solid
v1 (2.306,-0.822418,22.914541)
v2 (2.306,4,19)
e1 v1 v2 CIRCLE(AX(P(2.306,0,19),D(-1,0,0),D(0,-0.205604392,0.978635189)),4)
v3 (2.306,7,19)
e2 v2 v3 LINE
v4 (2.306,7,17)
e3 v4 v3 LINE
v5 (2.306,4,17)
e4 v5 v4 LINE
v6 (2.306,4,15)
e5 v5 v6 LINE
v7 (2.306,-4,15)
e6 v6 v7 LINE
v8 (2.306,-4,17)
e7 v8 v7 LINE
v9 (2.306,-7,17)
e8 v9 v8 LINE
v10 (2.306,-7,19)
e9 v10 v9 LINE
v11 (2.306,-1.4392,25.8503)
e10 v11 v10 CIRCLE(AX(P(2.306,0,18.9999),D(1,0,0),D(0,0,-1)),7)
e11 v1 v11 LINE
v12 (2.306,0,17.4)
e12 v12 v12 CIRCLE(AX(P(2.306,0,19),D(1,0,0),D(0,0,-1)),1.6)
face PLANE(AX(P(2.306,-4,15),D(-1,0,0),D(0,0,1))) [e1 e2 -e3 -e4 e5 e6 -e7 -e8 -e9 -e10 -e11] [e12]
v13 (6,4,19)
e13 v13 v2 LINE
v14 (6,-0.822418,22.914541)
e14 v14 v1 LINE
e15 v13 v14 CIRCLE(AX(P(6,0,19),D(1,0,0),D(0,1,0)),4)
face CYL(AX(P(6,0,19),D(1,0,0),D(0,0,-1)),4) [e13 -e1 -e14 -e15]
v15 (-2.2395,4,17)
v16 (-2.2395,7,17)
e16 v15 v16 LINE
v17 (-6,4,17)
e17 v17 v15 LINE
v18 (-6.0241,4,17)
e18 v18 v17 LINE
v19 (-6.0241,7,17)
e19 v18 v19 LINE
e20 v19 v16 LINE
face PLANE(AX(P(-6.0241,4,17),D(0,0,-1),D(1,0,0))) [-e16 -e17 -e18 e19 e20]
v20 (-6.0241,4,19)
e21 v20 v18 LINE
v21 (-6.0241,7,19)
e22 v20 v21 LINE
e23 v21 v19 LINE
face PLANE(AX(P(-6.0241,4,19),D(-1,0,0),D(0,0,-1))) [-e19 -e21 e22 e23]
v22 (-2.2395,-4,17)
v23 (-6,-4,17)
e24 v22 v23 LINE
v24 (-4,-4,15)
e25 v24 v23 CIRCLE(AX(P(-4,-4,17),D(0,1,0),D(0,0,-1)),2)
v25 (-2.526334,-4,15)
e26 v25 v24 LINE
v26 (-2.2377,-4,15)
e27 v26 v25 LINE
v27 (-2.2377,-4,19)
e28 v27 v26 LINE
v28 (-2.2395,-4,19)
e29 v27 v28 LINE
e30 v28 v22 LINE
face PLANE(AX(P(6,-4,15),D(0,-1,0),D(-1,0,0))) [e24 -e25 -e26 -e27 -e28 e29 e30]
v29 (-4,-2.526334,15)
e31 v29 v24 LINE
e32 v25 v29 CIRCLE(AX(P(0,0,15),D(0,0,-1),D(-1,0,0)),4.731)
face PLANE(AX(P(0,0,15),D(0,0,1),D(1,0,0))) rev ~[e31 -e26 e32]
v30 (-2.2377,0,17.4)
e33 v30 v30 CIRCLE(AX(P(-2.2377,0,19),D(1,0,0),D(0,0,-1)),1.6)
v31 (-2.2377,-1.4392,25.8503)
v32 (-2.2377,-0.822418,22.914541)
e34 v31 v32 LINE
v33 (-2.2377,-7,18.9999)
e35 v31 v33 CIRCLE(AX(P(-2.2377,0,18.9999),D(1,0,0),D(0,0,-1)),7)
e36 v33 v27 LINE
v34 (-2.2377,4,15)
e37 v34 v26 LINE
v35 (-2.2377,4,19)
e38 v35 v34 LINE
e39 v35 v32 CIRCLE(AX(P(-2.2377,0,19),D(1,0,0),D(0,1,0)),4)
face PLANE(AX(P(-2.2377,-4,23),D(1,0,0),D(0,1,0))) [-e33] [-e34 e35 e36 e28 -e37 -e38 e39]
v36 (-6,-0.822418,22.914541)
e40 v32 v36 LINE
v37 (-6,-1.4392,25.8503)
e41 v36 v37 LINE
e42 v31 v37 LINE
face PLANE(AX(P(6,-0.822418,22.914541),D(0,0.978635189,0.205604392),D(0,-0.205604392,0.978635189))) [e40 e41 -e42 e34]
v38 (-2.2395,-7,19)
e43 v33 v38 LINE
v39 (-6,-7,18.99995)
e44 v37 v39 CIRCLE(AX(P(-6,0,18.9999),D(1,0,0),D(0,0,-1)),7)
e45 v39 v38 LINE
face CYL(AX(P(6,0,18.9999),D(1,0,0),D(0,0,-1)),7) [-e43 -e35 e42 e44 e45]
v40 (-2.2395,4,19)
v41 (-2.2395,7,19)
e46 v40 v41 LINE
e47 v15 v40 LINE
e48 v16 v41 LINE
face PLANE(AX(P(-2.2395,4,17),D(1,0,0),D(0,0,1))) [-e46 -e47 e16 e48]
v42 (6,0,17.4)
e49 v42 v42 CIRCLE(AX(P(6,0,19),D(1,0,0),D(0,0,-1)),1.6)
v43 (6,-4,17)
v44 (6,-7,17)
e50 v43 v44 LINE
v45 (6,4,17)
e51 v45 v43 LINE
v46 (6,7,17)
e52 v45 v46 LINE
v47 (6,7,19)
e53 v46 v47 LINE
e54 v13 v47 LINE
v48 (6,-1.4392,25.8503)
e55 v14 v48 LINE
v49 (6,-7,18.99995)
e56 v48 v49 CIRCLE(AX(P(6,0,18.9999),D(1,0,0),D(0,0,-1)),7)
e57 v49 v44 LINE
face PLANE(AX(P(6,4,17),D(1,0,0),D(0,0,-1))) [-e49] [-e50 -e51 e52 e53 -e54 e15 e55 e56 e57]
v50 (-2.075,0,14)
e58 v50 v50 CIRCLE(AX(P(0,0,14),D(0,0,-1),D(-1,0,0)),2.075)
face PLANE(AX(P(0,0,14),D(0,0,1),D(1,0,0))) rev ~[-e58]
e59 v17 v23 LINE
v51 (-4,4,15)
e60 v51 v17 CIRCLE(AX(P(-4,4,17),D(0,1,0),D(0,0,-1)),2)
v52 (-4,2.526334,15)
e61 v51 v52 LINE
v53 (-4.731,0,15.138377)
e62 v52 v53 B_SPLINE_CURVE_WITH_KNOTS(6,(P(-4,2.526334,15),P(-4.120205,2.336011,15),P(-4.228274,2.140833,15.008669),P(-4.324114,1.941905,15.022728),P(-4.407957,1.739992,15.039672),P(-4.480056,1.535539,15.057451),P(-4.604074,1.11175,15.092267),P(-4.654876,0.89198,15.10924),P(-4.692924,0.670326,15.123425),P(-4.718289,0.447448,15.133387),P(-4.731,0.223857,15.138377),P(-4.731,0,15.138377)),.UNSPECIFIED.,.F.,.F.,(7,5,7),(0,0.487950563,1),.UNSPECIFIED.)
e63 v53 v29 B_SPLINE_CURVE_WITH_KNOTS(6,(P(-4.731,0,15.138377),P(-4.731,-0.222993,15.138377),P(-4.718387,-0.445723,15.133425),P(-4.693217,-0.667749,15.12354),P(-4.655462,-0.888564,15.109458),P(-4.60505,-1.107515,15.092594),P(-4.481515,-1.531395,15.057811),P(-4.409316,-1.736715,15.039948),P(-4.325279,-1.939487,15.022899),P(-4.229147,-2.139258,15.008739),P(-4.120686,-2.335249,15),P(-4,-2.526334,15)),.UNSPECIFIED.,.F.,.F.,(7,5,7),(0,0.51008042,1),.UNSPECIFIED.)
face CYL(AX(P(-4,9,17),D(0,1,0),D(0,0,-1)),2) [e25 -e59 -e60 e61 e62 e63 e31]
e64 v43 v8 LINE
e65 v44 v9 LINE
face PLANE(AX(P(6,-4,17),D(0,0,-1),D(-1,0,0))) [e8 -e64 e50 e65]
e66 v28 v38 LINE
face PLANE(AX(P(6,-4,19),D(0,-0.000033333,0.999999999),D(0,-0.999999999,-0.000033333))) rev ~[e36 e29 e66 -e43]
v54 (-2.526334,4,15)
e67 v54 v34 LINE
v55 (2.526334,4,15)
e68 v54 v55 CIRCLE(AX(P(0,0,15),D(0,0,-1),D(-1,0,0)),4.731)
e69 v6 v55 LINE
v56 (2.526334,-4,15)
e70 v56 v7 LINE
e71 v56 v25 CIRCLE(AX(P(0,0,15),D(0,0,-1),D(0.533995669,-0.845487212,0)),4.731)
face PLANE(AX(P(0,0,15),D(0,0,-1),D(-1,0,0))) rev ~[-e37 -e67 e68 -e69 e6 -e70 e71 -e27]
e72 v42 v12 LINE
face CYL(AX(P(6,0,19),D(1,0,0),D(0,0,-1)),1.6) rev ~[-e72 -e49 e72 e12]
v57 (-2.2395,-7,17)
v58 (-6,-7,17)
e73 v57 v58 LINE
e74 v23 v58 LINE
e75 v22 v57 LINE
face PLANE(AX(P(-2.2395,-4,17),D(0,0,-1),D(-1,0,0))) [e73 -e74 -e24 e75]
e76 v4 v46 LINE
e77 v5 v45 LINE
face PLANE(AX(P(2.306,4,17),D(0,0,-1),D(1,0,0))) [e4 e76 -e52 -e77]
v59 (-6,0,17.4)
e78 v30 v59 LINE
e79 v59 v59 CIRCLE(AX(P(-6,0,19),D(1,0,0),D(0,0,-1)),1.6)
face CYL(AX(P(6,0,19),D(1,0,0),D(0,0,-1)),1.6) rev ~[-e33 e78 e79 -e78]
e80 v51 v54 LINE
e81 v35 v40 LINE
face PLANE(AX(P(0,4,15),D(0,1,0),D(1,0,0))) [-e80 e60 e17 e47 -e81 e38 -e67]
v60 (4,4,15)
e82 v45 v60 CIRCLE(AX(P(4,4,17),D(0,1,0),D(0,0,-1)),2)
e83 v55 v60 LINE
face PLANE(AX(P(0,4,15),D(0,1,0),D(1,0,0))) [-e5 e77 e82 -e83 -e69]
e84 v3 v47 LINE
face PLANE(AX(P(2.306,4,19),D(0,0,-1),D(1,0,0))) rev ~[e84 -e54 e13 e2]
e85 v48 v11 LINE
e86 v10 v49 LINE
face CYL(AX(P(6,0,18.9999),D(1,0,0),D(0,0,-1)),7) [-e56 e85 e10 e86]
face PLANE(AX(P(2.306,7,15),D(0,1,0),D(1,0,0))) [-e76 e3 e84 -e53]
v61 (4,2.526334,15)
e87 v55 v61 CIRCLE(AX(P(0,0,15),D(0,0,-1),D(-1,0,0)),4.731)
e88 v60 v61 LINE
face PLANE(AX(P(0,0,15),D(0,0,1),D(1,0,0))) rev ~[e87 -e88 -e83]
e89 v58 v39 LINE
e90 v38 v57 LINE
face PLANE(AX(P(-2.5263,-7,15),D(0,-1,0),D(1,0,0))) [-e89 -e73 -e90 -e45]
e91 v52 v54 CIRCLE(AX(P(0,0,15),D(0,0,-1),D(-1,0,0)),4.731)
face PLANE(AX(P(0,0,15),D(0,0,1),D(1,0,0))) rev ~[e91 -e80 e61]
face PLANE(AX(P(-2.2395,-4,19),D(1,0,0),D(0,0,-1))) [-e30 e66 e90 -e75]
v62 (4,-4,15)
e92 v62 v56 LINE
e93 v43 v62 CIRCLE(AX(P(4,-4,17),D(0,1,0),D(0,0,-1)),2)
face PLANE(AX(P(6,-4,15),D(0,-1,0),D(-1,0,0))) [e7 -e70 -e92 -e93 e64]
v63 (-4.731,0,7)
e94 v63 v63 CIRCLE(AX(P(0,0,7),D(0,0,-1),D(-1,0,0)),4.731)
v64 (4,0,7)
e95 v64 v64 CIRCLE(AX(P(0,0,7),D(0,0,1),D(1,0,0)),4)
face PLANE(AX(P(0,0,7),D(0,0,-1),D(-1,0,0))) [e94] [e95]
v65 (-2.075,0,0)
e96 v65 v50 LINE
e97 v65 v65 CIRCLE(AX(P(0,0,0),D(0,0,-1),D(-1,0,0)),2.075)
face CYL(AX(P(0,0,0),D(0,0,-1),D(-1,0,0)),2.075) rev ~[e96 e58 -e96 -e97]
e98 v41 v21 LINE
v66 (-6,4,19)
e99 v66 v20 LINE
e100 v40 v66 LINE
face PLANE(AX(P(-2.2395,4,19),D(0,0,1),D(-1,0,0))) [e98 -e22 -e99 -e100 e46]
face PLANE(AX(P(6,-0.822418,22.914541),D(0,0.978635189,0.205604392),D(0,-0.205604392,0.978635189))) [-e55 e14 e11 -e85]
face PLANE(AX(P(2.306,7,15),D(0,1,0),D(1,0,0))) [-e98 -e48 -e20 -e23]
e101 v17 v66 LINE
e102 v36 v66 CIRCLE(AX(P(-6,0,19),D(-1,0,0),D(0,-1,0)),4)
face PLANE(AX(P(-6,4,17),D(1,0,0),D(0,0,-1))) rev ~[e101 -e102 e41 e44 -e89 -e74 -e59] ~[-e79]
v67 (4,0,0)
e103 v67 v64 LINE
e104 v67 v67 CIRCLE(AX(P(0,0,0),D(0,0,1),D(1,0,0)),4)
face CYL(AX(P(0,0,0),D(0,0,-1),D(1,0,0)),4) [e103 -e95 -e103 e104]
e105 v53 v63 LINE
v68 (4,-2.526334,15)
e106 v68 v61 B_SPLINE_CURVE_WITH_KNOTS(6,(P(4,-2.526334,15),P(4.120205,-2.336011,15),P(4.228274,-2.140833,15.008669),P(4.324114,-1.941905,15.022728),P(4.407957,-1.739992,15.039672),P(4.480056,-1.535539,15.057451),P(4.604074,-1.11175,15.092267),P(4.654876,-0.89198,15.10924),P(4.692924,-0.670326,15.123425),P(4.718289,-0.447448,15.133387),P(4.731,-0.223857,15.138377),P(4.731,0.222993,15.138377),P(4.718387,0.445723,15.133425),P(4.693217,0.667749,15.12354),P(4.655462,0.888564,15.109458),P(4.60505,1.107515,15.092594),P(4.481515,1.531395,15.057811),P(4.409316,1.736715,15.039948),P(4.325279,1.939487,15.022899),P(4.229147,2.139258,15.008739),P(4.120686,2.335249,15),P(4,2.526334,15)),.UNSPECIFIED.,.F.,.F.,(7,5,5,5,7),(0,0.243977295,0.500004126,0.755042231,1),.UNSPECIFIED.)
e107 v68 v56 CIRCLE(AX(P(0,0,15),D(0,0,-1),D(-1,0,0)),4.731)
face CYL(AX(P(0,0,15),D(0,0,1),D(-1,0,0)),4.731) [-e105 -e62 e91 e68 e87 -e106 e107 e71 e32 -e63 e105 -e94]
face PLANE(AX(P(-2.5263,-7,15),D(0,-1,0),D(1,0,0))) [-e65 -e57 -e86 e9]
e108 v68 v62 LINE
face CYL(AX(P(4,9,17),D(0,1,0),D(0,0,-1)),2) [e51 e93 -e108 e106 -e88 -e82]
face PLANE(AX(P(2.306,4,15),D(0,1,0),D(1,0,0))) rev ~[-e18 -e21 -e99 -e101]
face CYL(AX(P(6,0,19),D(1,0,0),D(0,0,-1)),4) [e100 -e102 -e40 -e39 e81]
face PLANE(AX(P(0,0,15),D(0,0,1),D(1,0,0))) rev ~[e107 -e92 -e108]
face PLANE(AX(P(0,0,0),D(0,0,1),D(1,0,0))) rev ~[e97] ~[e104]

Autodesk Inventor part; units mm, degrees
ref_plane "YZ Plane" through (0, 0, 0) normal (1, 0, 0) x (0, 1, 0)
ref_plane "XZ Plane" through (0, 0, 0) normal (0, 1, 0) x (-1, 0, 0)
ref_plane "XY Plane" through (0, 0, 0) normal (0, 0, 1) x (1, 0, 0)
sketch "Sketch1" plane through (0, 0, 0) normal (0, 0, 1) x (1, 0, 0)
  circle A0 centre (0, 0) radius 2
  circle A1 centre (0, 0) radius 4
  dimension "d0" = 4
  dimension "d1" = 8
extrude "Extrusion1" add sketch "Sketch1" along normal blind 15
sketch "Sketch2" plane through (0, 0, 15) normal (0, 0, 1) x (1, 0, 0)
  circle A0 centre (0, 0) radius 4 projected
  line L0 (0, 4) -> (6, 4)
  line L1 (6, 4) -> (6, -4)
  line L2 (6, -4) -> (0, -4)
  line L3 (0, -4) -> (0, 4)
  line L4 (0, 4) -> (-6, 4)
  line L5 (-6, 4) -> (-6, -4)
  line L6 (-6, -4) -> (0, -4)
  line L7 (0, -4) -> (0, 4)
  dimension "d4" = 6
  dimension "d5" = 6
extrude "Extrusion2" add sketch "Sketch2" along normal blind 8
sketch "Sketch3" plane through (0, 0, 23) normal (0, 0, 1) x (1, 0, 0)
  line L0 (6, 4) -> (-6, 4) projected
  line L1 (-6, -4) -> (6, -4) projected
  line L2 (-2.2377, 4) -> (2.306, 4)
  line L3 (2.306, 4) -> (2.306, -4)
  line L4 (2.306, -4) -> (-2.2377, -4)
  line L5 (-2.2377, -4) -> (-2.2377, 4)
  point P0 (0, 0)
extrude "Extrusion3" cut sketch "Sketch3" against normal blind 8
sketch "Sketch4" plane through (0, 0, 15) normal (0, 0, -1) x (-1, 0, 0)
  circle A0 centre (0, 0) radius 4
  circle A1 centre (0, 0) radius 4.731
extrude "Extrusion4" add sketch "Sketch4" along normal blind 8
sketch "Sketch5" plane through (6, -4, 15) normal (1, 0, 0) x (0, 0, -1)
  line L0 (0, 8) -> (-8, 8) projected
  line L1 (0, 0) -> (-8, 0) projected
  line L2 (-8, 8) -> (0, 8)
  line L3 (0, 8) -> (0, 0)
  line L4 (0, 0) -> (-8, 0)
  line L5 (-8, 0) -> (-8, 8)
  circle A0 centre (-4, 4) radius 1.6
  circle A1 centre (-4, 4) radius 4
  point P0 (15, 4)
  point P1 (-8, 4)
  point P2 (-4, 8)
  point P3 (-4, 0)
  dimension "d12" = 3.2
extrude "Extrusion5" cut sketch "Sketch5" against normal blind 14 contours A1 L5 L0 | A1 L1 L5 | A0
fillet "Fillet1" radius 2 2 edges at (-6, 0, 15) (6, 0, 15)
sketch "Sketch7" plane through (2.306, 4, 15) normal (0, 1, 0) x (1, 0, 0)
  point P0 (-2.306, 15)
sketch "Sketch8" plane through (2.306, 4, 15) normal (0, 1, 0) x (1, 0, 0)
  line L0 (0, -4) -> (3.694, -4) projected
  line L1 (0, 0) -> (0, -4) projected
  line L2 (3.694, -4) -> (0, -4)
  line L3 (0, -4) -> (0, -2)
  line L4 (0, -2) -> (3.694, -2)
  line L5 (3.694, -2) -> (3.694, -4)
  line L6 (-4.5455, -4) -> (-8.3301, -4)
  line L7 (-8.3301, -4) -> (-8.3301, -2)
  line L8 (-8.3301, -2) -> (-4.5455, -2)
  line L9 (-4.5455, -2) -> (-4.5455, -4)
  point P0 (-2.306, 15)
extrude "Extrusion7" add sketch "Sketch8" along normal blind 3
sketch "Sketch9" plane through (-2.5263, -4, 15) normal (0, -1, 0) x (1, 0, 0)
  line L0 (-3.4737, 2) -> (-3.4737, 4) projected
  line L1 (0.2868, 2) -> (-3.4978, 2) projected
  line L2 (-3.4737, 4) -> (0.2868, 4)
  line L3 (0.2868, 4) -> (0.2868, 2)
  line L4 (0.2868, 2) -> (-3.4737, 2)
  line L5 (-3.4737, 2) -> (-3.4737, 4)
  line L6 (4.8006, 4) -> (8.5263, 4)
  line L7 (8.5263, 4) -> (8.5263, 2)
  line L8 (8.5263, 2) -> (4.8006, 2)
  line L9 (4.8006, 2) -> (4.8006, 4)
  point P0 (2.5263, -15)
extrude "Extrusion8" add sketch "Sketch9" along normal blind 3
sketch "Sketch10" plane through (6, 4, 17) normal (1, 0, 0) x (0, 0, -1)
  circle A0 centre (-1.9999, -4) radius 7
  circle A1 centre (-2, -4) radius 1.6 projected
  circle A2 centre (-2, -4) radius 4
  line L0 (-2, -8) -> (-1.9999, -11)
  line L1 (-2, -4) -> (-8.8503, -5.4392)
  point P0 (17, -4)
  point P1 (-5.9145, -4.8224)
  dimension "d24" = 14
extrude "Extrusion9" add sketch "Sketch10" against normal blind 12 contours L1 A2 L0 A0 picked at (-2.5257, -9.94)
sketch "Sketch11" plane through (-2.5263, -4, 15) normal (0, -1, 0) x (1, 0, 0)
  line L0 (0, 0) -> (0.2886, 0) projected
  line L1 (0.2886, 0) -> (4.8323, 0)
  line L2 (4.8323, 0) -> (4.8323, 13.1536)
  line L3 (4.8323, 13.1536) -> (0.2886, 13.1536)
  line L4 (0.2886, 13.1536) -> (0.2886, 0)
  point P0 (2.5263, -15)
extrude "Extrusion10" cut sketch "Sketch11" along normal mid plane 12
sketch "Sketch12" plane through (0, 0, 0) normal (0, 0, -1) x (-1, 0, 0)
  circle A0 centre (0, 0) radius 2.075
  dimension "d29" = 4.15
extrude "Extrusion11" cut sketch "Sketch12" against normal blind 20
sketch "Sketch13" plane through (0, 0, 15) normal (0, 0, 1) x (1, 0, 0)
  circle A0 centre (0, 0) radius 2.2168
extrude "Extrusion12" add sketch "Sketch13" against normal blind 1
properties part number "hingejoint2"
